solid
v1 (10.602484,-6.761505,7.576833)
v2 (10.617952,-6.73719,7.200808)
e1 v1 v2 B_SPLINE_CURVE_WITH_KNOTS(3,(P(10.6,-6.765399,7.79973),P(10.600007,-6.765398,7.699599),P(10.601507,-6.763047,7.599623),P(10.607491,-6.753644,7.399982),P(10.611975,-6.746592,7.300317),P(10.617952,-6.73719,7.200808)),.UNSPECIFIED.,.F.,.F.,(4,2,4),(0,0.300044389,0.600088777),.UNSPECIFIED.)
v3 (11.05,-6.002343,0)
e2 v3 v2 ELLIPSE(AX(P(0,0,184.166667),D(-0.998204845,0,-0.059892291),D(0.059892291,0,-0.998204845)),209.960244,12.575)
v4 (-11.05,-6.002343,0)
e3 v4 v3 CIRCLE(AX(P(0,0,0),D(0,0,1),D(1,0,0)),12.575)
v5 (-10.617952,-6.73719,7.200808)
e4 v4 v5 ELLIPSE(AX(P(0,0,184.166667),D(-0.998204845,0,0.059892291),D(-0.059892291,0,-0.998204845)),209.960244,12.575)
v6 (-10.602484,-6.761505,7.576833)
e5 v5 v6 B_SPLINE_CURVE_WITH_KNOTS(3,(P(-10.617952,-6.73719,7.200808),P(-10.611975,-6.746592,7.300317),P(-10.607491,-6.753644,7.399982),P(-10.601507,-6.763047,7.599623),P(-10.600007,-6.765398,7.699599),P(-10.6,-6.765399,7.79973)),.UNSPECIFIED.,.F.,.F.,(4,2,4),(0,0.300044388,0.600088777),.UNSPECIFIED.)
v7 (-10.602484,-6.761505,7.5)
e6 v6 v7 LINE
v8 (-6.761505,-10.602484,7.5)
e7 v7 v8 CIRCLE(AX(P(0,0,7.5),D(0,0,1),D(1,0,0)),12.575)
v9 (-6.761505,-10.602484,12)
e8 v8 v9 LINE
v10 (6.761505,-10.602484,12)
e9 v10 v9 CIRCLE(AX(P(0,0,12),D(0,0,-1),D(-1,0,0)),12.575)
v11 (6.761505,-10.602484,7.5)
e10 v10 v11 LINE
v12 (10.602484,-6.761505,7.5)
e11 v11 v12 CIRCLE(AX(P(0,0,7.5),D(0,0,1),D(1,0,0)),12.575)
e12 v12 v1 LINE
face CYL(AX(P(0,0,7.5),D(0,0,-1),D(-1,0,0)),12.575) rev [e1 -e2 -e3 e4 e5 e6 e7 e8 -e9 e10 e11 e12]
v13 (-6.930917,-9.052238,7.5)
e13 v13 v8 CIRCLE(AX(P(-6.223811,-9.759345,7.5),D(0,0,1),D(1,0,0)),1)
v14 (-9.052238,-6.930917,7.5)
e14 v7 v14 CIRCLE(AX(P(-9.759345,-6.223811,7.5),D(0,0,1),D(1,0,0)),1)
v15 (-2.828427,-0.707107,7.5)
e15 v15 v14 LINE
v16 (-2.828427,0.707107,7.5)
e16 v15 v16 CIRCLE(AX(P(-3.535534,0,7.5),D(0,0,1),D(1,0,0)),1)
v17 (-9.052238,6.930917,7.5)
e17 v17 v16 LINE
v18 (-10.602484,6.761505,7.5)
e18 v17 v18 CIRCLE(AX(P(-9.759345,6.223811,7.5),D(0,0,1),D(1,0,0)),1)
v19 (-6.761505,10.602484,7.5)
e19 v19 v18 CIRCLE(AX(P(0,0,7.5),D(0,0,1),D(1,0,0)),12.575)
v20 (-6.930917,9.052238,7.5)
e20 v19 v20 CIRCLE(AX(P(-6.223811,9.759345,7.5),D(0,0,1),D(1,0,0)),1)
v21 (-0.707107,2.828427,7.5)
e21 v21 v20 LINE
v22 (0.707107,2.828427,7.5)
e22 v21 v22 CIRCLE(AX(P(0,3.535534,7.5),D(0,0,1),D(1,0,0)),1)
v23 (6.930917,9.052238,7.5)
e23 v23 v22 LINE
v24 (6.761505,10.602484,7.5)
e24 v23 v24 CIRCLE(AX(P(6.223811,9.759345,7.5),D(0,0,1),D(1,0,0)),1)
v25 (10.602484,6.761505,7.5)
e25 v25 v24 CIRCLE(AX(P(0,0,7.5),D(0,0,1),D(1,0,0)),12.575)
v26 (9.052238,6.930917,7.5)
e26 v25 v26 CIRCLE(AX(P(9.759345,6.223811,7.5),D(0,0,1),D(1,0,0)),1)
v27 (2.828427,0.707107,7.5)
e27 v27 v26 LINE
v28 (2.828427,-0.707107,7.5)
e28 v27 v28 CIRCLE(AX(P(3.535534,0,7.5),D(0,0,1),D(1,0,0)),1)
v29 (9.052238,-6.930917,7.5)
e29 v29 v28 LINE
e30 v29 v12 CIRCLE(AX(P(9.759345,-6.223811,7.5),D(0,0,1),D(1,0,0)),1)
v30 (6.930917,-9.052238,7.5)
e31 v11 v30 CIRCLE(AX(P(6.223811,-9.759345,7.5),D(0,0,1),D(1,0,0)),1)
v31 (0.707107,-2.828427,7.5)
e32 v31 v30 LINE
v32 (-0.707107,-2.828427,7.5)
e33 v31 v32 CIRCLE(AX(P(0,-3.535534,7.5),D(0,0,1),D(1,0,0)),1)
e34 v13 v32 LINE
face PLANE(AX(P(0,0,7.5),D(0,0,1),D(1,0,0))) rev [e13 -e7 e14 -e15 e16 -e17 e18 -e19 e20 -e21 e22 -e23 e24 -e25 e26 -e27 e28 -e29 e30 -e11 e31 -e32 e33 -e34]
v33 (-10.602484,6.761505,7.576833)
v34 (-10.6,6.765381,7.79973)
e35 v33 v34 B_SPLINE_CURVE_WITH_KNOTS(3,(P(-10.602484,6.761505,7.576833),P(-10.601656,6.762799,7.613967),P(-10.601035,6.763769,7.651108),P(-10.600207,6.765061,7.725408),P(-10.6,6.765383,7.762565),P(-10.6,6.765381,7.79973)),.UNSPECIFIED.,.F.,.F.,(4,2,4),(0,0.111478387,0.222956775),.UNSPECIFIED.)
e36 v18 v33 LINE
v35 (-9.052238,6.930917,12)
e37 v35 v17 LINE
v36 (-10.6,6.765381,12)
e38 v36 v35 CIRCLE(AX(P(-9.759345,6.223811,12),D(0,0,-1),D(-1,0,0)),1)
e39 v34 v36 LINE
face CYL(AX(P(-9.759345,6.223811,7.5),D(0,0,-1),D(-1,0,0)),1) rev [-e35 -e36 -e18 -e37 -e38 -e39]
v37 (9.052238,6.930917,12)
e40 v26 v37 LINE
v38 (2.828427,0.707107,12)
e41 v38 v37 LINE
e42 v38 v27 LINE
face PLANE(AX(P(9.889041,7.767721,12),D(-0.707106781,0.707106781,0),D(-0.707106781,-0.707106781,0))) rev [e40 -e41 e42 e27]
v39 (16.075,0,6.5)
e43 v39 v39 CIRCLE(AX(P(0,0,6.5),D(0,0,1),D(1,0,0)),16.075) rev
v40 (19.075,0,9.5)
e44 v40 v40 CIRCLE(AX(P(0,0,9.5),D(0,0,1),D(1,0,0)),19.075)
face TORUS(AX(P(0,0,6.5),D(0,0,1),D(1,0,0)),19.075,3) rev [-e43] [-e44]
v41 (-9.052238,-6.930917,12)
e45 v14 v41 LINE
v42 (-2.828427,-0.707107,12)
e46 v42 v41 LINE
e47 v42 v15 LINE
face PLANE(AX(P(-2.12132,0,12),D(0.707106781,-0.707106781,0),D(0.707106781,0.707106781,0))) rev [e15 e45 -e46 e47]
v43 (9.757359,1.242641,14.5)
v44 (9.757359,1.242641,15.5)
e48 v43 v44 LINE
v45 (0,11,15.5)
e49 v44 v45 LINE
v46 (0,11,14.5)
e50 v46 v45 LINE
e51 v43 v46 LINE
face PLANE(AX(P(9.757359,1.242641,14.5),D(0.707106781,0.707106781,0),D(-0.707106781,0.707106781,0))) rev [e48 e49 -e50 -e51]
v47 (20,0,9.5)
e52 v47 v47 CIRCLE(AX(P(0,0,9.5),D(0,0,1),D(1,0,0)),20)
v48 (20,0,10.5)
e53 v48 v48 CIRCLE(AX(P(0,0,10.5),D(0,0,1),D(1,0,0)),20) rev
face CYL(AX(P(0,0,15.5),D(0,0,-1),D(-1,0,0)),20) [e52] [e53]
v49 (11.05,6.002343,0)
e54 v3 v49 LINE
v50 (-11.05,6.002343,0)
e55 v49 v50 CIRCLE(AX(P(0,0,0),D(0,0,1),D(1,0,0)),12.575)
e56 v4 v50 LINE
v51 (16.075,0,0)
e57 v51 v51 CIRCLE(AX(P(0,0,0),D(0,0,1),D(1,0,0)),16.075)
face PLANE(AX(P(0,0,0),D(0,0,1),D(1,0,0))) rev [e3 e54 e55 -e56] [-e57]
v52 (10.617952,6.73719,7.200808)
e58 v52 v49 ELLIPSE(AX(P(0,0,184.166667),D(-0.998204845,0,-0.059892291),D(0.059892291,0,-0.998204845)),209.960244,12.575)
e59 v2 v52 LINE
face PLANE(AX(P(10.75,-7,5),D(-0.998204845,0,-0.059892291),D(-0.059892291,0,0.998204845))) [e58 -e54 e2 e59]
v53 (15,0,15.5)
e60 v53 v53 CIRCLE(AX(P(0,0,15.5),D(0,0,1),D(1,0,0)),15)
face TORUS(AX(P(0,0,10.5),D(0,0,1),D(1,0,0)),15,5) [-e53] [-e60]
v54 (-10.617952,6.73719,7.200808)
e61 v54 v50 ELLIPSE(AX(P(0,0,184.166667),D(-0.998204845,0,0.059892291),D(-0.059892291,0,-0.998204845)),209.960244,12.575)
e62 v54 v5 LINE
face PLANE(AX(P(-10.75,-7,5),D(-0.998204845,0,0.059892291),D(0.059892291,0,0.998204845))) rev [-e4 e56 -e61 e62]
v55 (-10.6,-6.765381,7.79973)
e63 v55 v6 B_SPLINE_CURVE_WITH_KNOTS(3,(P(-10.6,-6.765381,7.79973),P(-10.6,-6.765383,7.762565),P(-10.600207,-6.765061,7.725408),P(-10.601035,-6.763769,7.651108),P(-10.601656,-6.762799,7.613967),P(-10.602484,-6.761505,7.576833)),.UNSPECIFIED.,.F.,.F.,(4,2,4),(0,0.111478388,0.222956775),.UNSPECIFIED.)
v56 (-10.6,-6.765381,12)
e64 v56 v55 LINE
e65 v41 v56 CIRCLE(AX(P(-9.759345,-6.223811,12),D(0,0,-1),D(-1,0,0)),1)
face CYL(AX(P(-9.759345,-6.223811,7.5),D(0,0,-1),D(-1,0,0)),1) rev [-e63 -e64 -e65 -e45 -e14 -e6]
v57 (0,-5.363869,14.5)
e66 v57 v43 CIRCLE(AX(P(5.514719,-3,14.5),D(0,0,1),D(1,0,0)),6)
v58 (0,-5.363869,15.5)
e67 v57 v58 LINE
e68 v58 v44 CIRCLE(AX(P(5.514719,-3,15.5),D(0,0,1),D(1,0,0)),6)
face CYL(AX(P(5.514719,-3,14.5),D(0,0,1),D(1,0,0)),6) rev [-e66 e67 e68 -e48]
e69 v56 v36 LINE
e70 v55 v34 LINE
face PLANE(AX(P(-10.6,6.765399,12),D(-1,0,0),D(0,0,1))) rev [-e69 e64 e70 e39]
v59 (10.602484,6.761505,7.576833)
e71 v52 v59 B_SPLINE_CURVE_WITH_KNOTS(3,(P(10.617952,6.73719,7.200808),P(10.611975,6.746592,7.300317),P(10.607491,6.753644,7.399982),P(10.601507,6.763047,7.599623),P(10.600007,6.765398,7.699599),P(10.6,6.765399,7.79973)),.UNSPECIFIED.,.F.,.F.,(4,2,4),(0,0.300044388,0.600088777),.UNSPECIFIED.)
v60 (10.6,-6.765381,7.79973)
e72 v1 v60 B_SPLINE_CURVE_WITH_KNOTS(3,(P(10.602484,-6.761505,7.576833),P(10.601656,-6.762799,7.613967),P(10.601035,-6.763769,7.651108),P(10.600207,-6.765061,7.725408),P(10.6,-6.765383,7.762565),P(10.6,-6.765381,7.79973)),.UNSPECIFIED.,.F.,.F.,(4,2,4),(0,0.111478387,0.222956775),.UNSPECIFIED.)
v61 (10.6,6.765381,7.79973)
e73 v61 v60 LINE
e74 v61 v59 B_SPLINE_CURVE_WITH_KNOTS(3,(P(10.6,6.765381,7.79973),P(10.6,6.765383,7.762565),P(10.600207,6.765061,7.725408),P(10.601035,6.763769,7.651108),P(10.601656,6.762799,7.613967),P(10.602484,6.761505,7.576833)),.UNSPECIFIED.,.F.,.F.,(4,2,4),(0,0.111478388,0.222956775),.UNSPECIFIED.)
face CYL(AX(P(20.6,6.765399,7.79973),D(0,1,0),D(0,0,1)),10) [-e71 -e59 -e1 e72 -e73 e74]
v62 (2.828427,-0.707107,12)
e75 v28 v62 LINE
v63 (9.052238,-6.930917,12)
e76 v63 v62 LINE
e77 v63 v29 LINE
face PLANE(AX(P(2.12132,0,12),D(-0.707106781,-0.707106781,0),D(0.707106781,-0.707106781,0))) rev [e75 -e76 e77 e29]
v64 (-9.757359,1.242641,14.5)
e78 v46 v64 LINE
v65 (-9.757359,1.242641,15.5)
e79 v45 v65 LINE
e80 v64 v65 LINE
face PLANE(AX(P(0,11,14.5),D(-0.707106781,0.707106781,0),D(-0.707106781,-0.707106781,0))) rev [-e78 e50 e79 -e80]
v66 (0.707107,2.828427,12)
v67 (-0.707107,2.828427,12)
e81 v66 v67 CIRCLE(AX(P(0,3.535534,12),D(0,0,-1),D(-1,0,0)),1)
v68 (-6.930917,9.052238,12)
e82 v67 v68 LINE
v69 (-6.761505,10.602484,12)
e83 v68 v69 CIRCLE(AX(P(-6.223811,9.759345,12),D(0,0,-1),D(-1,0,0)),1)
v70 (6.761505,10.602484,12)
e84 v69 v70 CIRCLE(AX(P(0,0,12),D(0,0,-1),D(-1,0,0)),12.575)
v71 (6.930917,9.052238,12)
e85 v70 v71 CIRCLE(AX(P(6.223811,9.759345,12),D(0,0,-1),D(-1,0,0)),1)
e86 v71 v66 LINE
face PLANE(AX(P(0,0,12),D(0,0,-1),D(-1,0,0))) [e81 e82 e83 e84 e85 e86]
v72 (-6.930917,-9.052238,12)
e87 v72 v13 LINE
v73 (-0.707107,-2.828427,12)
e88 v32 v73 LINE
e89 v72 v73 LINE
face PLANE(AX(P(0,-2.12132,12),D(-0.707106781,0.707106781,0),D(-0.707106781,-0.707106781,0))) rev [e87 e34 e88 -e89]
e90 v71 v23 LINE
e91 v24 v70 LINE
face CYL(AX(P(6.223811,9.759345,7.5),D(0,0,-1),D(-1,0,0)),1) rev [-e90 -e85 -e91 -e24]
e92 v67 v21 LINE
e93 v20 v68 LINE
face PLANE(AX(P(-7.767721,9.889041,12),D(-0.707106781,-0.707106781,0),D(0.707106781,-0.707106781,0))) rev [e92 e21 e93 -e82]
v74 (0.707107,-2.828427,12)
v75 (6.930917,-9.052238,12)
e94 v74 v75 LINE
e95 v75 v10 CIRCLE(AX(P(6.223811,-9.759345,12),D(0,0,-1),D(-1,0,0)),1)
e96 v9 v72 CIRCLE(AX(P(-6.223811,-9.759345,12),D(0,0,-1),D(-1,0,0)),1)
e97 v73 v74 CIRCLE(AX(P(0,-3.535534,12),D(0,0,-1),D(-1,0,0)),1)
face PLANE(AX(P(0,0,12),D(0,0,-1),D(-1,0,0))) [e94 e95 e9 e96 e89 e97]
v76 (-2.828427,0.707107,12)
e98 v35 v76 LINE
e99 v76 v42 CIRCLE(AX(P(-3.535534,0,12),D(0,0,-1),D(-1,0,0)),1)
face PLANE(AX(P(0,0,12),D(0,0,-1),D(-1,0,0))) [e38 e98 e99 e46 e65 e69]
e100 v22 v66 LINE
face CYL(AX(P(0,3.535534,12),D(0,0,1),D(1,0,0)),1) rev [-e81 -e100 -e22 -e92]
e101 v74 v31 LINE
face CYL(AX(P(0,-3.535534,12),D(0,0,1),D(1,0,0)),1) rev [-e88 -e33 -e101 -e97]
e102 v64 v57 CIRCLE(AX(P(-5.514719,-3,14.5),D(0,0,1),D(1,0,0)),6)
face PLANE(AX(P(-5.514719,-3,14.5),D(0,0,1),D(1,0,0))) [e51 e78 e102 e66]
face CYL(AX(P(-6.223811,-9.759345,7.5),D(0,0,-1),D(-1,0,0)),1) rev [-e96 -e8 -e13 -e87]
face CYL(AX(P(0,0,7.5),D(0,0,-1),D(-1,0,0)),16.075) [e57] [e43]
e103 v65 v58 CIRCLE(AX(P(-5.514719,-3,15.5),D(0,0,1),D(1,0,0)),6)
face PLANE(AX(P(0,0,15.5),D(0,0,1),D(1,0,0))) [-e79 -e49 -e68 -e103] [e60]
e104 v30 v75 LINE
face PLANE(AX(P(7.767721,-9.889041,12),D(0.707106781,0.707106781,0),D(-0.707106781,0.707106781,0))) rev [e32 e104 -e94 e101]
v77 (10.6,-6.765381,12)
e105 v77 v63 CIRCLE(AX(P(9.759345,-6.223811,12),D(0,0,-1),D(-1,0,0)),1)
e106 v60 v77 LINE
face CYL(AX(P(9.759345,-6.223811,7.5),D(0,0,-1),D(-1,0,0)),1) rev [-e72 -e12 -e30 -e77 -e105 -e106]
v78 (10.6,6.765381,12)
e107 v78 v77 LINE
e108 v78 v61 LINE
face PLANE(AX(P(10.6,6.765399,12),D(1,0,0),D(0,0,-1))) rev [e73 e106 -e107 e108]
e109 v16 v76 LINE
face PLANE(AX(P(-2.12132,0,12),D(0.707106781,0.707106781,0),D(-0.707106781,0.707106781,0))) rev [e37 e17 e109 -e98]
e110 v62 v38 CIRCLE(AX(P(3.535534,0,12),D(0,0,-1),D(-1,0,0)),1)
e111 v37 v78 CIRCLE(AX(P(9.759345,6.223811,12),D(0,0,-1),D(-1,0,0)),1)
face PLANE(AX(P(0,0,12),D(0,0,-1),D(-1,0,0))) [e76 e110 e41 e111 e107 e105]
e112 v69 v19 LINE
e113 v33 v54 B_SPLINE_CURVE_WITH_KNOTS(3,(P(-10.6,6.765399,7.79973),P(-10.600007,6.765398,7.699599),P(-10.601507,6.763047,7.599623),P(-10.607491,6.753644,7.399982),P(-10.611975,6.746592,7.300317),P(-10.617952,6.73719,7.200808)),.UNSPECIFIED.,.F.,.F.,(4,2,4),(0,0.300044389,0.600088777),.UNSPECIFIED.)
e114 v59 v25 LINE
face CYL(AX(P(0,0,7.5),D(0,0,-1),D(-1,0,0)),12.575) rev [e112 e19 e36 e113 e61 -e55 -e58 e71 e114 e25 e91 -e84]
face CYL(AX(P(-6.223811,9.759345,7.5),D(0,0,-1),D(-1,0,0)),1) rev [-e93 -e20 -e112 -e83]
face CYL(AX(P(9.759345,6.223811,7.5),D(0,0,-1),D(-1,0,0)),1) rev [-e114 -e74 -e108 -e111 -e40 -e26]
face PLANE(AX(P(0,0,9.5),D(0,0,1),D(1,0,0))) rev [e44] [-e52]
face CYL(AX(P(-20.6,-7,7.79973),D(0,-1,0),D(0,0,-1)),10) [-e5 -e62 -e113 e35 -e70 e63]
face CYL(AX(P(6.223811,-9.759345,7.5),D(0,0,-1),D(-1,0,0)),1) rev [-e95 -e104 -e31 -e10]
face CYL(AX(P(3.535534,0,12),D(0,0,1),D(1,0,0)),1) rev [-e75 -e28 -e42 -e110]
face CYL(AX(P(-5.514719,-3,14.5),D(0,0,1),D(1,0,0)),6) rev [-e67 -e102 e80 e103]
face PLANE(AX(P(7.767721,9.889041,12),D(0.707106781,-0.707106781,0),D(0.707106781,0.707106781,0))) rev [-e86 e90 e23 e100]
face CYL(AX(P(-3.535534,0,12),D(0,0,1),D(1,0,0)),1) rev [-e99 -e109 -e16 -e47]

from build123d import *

# Parameters (mm, degrees)
SKETCH_1_R          = 16.075
SKETCH_1_R_2        = 12.575
EXTRUDE_1_DEPTH     = 7.5
SKETCH_2_R          = 16.075
EXTRUDE_2_DEPTH     = 2
SKETCH_3_R          = 20
EXTRUDE_3_DEPTH     = 6
FILLET_1_R          = 5
CUT_EXTRUDE_1_DEPTH = 1
EXTRUDE_4_DEPTH     = 7
CUT_EXTRUDE_2_DEPTH = 4.5
FILLET_2_R          = 3
FILLET_3_R          = 10
FILLET_4_R          = 1


with BuildPart() as part:
    # 草图1 → 凸台-拉伸1 (new body)
    with BuildSketch(Plane.XY):
        Circle(SKETCH_1_R)
        Circle(SKETCH_1_R_2, mode=Mode.SUBTRACT)
    extrude(amount=EXTRUDE_1_DEPTH)

    # 草图2 → 凸台-拉伸2 (add)
    with BuildSketch(Plane.XY.offset(7.5)):
        Circle(SKETCH_2_R)
    extrude(amount=EXTRUDE_2_DEPTH)

    # 草图3 → 凸台-拉伸3 (add)
    with BuildSketch(Plane.XY.offset(9.5)):
        Circle(SKETCH_3_R)
    extrude(amount=EXTRUDE_3_DEPTH)

    # 圆角1
    fillet_1_edges = [part.edges().sort_by_distance(p)[0] for p in [
        (-20, 0, 15.5),
    ]]
    fillet(fillet_1_edges, radius=FILLET_1_R)

    # 草图4 → 切除-拉伸1 (cut)
    with BuildSketch(Plane.XY.offset(15.5)):
        with BuildLine():
            Line((9.757359313, 1.242640687), (0, 11))
            Line((0, 11), (-9.757359313, 1.242640687))
            ThreePointArc((-9.757359313, 1.242640687), (-8.878650761, -7.968295542), (0, -5.363869387))
            ThreePointArc((0, -5.363869387), (8.878650761, -7.968295542), (9.757359313, 1.242640687))
        make_face()
    extrude(amount=-CUT_EXTRUDE_1_DEPTH, mode=Mode.SUBTRACT)

    # 草图6 → 凸台-拉伸4 (add, symmetric)
    with BuildSketch(Plane(origin=(0, 0, 0), x_dir=(1, 0, 0), z_dir=(0, 1, 0))):
        Polygon((10.75, -5), (11.05, 0), (14, 0), (14, -7.5), (10.6, -7.5), align=None)
    extrude_4 = extrude(amount=EXTRUDE_4_DEPTH, both=True)

    # 镜向1: 凸台-拉伸4 across plane
    add(extrude_4.mirror(Plane(origin=(0, 0, 0), x_dir=(0, 0, 1), z_dir=(1, 0, 0))))

    # 草图5 → 切除-拉伸2 (cut)
    with BuildSketch(Plane(origin=(0, 0, 7.5), x_dir=(-1, 0, 0), z_dir=(0, 0, -1))):
        with BuildLine():
            Line((7.767720909, 9.889041252), (0, 2.121320344))
            Line((0, 2.121320344), (-7.767720909, 9.889041252))
            ThreePointArc((-7.767720909, 9.889041252), (0, 12.575), (7.767720909, 9.889041252))
        make_face()
        with BuildLine():
            Line((-7.767720909, -9.889041252), (0, -2.121320344))
            Line((0, -2.121320344), (7.767720909, -9.889041252))
            ThreePointArc((7.767720909, -9.889041252), (0, -12.575), (-7.767720909, -9.889041252))
        make_face()
        with BuildLine():
            Line((-9.889041252, 7.767720909), (-2.121320344, 0))
            Line((-2.121320344, 0), (-9.889041252, -7.767720909))
            ThreePointArc((-9.889041252, -7.767720909), (-10.256771671, -7.275249816), (-10.6, -6.765399101))
            Line((-10.6, -6.765399101), (-10.6, 6.765399101))
            ThreePointArc((-10.6, 6.765399101), (-10.256771671, 7.275249816), (-9.889041252, 7.767720909))
        make_face()
        with BuildLine():
            Line((2.121320344, 0), (9.889041252, 7.767720909))
            ThreePointArc((9.889041252, 7.767720909), (10.256771671, 7.275249816), (10.6, 6.765399101))
            Line((10.6, 6.765399101), (10.6, -6.765399101))
            ThreePointArc((10.6, -6.765399101), (10.256771671, -7.275249816), (9.889041252, -7.767720909))
            Line((9.889041252, -7.767720909), (2.121320344, 0))
        make_face()
    extrude(amount=-CUT_EXTRUDE_2_DEPTH, mode=Mode.SUBTRACT)

    # 圆角2
    fillet_2_edges = [part.edges().sort_by_distance(p)[0] for p in [
        (-16.075, 0, 9.5),
    ]]
    fillet(fillet_2_edges, radius=FILLET_2_R)

    # 圆角3
    # the kernel refuses this fillet: 10 mm, written as the material it takes off along each edge
    with BuildSketch(Plane(origin=(10.6, -7.514725314, 7.5), x_dir=(0.05989229072795002, 0, -0.9982048454657784), z_dir=(0, 1, 0))) as fillet_3_piece_1_section:
        with BuildLine():
            CenterArc((FILLET_3_R * 0.0299730484909, -FILLET_3_R), FILLET_3_R, 90, 3.433630362)
            Line((-FILLET_3_R * 0.029919242237, -FILLET_3_R * 0.00179515453422), (0, 0))
            Line((0, 0), (FILLET_3_R * 0.0299730484909, 0))
        make_face()
    fillet_3_piece_1 = extrude(amount=15.029450627, mode=Mode.PRIVATE)
    fillet_3_piece_1 = fillet_3_piece_1 & Plane(origin=(0, 0, 7.497328359), x_dir=(1, 0, 0), z_dir=(0, 0, -1)) * Cylinder(12.575, 32, mode=Mode.PRIVATE)
    add(fillet_3_piece_1, mode=Mode.SUBTRACT)
    with BuildSketch(Plane(origin=(-10.6, -7.514725314, 7.5), x_dir=(-0.05989229072795002, 0, -0.9982048454657784), z_dir=(0, 1, 0))) as fillet_3_piece_2_section:
        with BuildLine():
            CenterArc((FILLET_3_R * 0.0299730484909, FILLET_3_R), FILLET_3_R, 266.566369638, 3.433630362)
            Line((-FILLET_3_R * 0.029919242237, FILLET_3_R * 0.00179515453422), (0, 0))
            Line((0, 0), (FILLET_3_R * 0.0299730484909, 0))
        make_face()
    fillet_3_piece_2 = extrude(amount=15.029450627, mode=Mode.PRIVATE)
    fillet_3_piece_2 = fillet_3_piece_2 & Plane(origin=(0, 0, 7.497328359), x_dir=(1, 0, 0), z_dir=(0, 0, -1)) * Cylinder(12.575, 32, mode=Mode.PRIVATE)
    add(fillet_3_piece_2, mode=Mode.SUBTRACT)

    # 圆角4
    # the kernel refuses this fillet: 1 mm, written as the material it adds along each edge
    with BuildSketch(Plane(origin=(0, -2.121320344, 7.5), x_dir=(0.7071067811865518, -0.7071067811865432, 0), z_dir=(0, 0, 1)), Plane(origin=(2.121320344, 0, 7.5), x_dir=(0.7071067811865438, 0.7071067811865512, 0), z_dir=(0, 0, 1))) as fillet_4_piece_1:
        with BuildLine():
            CenterArc((FILLET_4_R, -FILLET_4_R), FILLET_4_R, 90, 90)
            Line((0, -FILLET_4_R), (0, 0))
            Line((0, 0), (FILLET_4_R, 0))
        make_face()
    extrude(amount=7)
    with BuildSketch(Plane(origin=(-7.767720909, -9.889041252, 7.5), x_dir=(0.8157540941110909, -0.5783988744292242, 0), z_dir=(0, 0, 1)), Plane(origin=(-9.889041252, 7.767720909, 7.5), x_dir=(-0.5783988744292212, -0.8157540941110929, 0), z_dir=(0, 0, 1)), Plane(origin=(7.767720909, 9.889041252, 7.5), x_dir=(-0.8157540941110928, 0.5783988744292216, 0), z_dir=(0, 0, 1))) as fillet_4_piece_2:
        with BuildLine():
            CenterArc((1.184434693, 0.998796574), FILLET_4_R, 170.338006618, 102.473187785)
            Line((0.198619674, 1.166632059), (0, 0))
            ThreePointArc((0, 0), (0.616739804, -0.015133081), (1.233479607, 0))
        make_face()
    extrude(amount=7.583699018)
    with BuildSketch(Plane(origin=(-9.889041252, -7.767720909, 7.5), x_dir=(-0.578398874429234, 0.8157540941110841, 0), z_dir=(0, 0, 1))) as fillet_4_piece_3_section:
        with BuildLine():
            CenterArc((1.184434693, -0.998796574), FILLET_4_R, 87.188805597, 102.473187785)
            Line((0.198619674, -1.166632059), (0, 0))
            ThreePointArc((0, 0), (0.616739804, 0.015133081), (1.233479607, 0))
        make_face()
    fillet_4_piece_3 = extrude(amount=7.583699018, mode=Mode.PRIVATE)
    fillet_4_piece_3 = split(fillet_4_piece_3, bisect_by=Plane(origin=(-10.600515055, -6.764586018, 14.5), z_dir=(0, 0, -1)), keep=Keep.TOP, mode=Mode.PRIVATE)
    add(fillet_4_piece_3)
    with BuildSketch(Plane(origin=(-2.121320344, 0, 7.5), x_dir=(-0.7071067811865511, 0.7071067811865441, 0), z_dir=(0, 0, 1)), Plane(origin=(0, 2.121320344, 7.5), x_dir=(0.7071067811865439, 0.7071067811865512, 0), z_dir=(0, 0, 1))) as fillet_4_piece_4:
        with BuildLine():
            CenterArc((FILLET_4_R, FILLET_4_R), FILLET_4_R, 180, 90)
            Line((0, FILLET_4_R), (0, 0))
            Line((0, 0), (FILLET_4_R, 0))
        make_face()
    extrude(amount=7)
    with BuildSketch(Plane(origin=(-7.767720909, 9.889041252, 7.5), x_dir=(0.8157540941110883, 0.5783988744292278, 0), z_dir=(0, 0, 1)), Plane(origin=(9.889041252, 7.767720909, 7.5), x_dir=(0.5783988744292311, -0.8157540941110861, 0), z_dir=(0, 0, 1)), Plane(origin=(7.767720909, -9.889041252, 7.5), x_dir=(-0.8157540941110859, -0.5783988744292314, 0), z_dir=(0, 0, 1))) as fillet_4_piece_5:
        with BuildLine():
            CenterArc((1.184434693, -0.998796574), FILLET_4_R, 87.188805597, 102.473187785)
            Line((0.198619674, -1.166632059), (0, 0))
            ThreePointArc((0, 0), (0.616739804, 0.015133081), (1.233479607, 0))
        make_face()
    extrude(amount=7.583699018)
    with BuildSketch(Plane(origin=(9.889041252, -7.767720909, 7.5), x_dir=(0.5783988744292226, 0.8157540941110919, 0), z_dir=(0, 0, 1))) as fillet_4_piece_6_section:
        with BuildLine():
            CenterArc((1.184434693, 0.998796574), FILLET_4_R, 170.338006618, 102.473187785)
            Line((0.198619674, 1.166632059), (0, 0))
            ThreePointArc((0, 0), (0.616739804, -0.015133081), (1.233479607, 0))
        make_face()
    fillet_4_piece_6 = extrude(amount=7.583699018, mode=Mode.PRIVATE)
    fillet_4_piece_6 = split(fillet_4_piece_6, bisect_by=Plane(origin=(10.600515055, -6.764586018, 14.5), z_dir=(0, 0, -1)), keep=Keep.TOP, mode=Mode.PRIVATE)
    add(fillet_4_piece_6)


solid = part.part
